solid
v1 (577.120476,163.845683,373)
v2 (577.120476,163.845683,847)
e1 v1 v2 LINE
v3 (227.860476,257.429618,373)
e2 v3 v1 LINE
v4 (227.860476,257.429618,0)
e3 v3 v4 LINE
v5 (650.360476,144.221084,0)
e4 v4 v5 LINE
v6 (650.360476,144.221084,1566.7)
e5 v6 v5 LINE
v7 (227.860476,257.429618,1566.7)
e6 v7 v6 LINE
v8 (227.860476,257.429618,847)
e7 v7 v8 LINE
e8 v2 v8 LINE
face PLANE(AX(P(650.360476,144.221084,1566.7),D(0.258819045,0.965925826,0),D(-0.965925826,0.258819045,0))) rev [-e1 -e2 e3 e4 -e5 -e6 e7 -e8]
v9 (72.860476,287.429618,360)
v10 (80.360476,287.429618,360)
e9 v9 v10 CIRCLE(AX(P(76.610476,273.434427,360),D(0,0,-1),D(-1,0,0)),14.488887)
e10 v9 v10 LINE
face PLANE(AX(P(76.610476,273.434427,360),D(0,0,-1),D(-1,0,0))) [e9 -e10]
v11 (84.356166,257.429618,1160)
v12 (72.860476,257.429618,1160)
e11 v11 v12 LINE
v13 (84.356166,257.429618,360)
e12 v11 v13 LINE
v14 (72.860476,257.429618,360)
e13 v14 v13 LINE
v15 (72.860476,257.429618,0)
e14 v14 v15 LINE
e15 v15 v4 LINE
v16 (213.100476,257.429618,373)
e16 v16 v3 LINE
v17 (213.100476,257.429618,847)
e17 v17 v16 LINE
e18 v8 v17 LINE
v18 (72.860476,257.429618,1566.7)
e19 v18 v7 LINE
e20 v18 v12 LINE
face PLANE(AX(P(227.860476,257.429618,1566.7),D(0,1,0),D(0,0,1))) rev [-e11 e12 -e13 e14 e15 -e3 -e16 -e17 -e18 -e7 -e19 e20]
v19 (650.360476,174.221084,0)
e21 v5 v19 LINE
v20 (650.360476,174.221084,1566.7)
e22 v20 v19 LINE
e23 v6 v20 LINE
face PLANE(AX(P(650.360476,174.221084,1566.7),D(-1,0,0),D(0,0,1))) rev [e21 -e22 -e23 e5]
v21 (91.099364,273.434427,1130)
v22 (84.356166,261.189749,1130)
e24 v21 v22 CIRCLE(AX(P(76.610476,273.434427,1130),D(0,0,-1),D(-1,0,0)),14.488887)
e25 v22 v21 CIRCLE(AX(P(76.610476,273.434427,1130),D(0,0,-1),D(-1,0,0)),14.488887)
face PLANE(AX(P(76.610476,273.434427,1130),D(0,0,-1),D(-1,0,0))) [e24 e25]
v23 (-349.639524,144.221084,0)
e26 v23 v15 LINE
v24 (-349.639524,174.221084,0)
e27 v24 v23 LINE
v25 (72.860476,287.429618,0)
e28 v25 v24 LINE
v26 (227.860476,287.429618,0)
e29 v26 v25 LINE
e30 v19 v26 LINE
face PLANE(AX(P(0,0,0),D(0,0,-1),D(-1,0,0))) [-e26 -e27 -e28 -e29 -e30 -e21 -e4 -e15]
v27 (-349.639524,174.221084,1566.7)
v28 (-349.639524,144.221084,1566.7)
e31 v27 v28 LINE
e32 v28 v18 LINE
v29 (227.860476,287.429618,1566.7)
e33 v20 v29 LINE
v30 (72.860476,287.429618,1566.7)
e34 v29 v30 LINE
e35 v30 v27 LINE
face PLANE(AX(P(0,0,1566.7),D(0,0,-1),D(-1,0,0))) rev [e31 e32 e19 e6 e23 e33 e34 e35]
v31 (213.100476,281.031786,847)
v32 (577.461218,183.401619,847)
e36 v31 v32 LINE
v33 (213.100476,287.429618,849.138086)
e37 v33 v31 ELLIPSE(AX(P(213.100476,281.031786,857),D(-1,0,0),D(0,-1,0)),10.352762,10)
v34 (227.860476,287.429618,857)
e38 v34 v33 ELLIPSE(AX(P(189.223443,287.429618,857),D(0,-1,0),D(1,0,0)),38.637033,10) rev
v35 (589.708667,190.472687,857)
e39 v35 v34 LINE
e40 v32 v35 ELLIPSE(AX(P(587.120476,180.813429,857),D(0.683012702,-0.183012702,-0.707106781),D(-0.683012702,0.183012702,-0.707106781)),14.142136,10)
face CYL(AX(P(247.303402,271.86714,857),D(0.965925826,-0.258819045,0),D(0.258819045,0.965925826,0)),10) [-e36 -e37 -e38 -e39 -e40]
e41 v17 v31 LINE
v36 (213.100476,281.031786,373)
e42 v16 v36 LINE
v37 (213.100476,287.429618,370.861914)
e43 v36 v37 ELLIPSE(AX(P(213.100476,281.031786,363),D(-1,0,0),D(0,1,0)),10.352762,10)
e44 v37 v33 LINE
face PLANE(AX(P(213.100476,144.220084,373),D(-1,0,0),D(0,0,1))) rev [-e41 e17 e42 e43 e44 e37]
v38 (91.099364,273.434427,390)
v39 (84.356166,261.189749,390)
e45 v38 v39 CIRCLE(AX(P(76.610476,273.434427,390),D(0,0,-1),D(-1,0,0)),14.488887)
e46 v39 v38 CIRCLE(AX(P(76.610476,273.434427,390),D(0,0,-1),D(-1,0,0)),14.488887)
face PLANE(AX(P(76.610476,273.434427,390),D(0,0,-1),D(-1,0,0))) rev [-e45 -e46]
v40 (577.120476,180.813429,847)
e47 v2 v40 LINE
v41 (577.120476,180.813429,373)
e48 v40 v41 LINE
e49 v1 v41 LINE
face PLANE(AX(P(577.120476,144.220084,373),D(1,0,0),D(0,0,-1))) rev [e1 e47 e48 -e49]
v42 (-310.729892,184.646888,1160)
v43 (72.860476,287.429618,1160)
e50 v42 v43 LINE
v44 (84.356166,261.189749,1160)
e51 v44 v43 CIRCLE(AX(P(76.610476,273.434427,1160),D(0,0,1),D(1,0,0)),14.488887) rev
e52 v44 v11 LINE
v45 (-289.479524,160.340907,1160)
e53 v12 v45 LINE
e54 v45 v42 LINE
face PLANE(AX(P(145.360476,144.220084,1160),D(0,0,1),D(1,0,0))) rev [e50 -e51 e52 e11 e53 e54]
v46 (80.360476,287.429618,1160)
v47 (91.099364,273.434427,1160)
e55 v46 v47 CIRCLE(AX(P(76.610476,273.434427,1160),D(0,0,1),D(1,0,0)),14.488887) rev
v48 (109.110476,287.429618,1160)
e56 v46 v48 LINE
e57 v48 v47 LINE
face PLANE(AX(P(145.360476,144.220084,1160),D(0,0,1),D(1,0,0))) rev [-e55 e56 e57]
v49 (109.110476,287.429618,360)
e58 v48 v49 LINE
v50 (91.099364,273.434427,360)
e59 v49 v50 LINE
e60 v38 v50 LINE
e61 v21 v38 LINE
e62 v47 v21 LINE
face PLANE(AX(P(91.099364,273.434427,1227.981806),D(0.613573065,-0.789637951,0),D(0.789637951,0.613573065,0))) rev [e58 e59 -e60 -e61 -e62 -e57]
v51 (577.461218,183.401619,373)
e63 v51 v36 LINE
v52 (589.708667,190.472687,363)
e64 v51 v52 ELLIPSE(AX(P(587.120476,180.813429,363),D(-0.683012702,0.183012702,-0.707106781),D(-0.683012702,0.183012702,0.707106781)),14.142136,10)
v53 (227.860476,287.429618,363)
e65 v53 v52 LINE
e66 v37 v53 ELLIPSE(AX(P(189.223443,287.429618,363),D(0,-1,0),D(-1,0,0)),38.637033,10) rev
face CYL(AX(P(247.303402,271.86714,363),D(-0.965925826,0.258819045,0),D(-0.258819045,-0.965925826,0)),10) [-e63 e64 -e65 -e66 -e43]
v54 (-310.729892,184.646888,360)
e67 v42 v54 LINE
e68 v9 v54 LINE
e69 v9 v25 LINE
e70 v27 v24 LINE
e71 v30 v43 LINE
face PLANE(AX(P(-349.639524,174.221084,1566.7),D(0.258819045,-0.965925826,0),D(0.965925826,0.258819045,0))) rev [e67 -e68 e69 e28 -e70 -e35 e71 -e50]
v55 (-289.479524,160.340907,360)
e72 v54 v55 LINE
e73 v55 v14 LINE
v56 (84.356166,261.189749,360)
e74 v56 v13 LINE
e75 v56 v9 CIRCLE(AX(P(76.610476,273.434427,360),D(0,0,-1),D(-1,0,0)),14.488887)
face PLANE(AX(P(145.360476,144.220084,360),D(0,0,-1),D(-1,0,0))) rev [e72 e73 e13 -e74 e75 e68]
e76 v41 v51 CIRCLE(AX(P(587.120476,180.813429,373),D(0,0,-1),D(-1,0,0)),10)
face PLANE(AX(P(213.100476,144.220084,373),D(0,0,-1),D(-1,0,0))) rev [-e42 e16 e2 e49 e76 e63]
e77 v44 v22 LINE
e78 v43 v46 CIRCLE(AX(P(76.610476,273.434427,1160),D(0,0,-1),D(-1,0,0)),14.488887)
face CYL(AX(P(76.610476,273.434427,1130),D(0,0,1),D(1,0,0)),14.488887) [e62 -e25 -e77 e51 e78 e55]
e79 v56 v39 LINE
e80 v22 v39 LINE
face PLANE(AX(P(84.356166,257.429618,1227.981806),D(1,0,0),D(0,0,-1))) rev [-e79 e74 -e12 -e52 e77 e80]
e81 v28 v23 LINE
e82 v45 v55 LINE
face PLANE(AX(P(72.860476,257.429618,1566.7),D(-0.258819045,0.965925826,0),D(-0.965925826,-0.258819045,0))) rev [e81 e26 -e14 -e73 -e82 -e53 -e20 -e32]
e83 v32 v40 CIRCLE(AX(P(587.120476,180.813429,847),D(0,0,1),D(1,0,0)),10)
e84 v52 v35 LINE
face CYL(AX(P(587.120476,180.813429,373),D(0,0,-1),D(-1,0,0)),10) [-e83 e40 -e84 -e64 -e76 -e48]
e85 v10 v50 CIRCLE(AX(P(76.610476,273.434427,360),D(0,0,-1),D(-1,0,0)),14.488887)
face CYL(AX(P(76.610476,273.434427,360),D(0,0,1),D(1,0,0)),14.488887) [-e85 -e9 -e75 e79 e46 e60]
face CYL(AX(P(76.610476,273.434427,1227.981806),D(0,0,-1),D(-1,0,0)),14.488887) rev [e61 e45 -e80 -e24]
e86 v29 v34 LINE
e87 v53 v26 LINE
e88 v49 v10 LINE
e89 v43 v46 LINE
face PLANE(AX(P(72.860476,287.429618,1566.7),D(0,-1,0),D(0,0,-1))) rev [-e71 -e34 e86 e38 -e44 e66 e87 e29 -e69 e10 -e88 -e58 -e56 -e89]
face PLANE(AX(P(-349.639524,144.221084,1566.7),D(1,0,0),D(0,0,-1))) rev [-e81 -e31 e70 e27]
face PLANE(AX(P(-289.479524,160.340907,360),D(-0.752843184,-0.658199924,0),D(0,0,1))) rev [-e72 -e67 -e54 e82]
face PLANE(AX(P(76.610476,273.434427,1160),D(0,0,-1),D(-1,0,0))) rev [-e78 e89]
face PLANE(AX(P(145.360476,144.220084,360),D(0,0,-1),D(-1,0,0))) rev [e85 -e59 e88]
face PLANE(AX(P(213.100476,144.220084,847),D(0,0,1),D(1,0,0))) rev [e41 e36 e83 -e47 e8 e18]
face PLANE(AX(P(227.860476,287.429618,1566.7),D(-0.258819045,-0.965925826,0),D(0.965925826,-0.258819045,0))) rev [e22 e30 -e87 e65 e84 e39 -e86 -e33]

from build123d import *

# Parameters (mm, degrees)
AUFSATZ_LINEAR_AUSTRAGEN1_DEPTH = 1566.7
SCHNITT_LINEAR_AUSTRAGEN1_REACH = 1704.359
FASE1_SIZE2                     = 30
FASE1_SIZE                      = 22
VERRUNDUNG1_R                   = 10
SKIZZE4_R                       = 14.488887394336269
AUFSATZ_LINEAR_AUSTRAGEN3_DEPTH = 30
AUFSATZ_LINEAR_AUSTRAGEN7_REACH = 1402.712
LINEARES_MUSTER2_COUNT          = 2
LINEARES_MUSTER2_PITCH          = 770.0000000000005


with BuildPart() as part:
    # Skizze1 → Aufsatz-Linear austragen1 (new body)
    with BuildSketch(Plane.XY):
        Polygon((650.3604764885325, 174.22108378429925), (650.3604764885325, 144.22108378429925), (227.86047648853256, 257.42961758644554), (72.86047648853256, 257.42961758644554), (-349.6395235114674, 144.22108378429914), (-349.6395235114674, 174.2210837842995), (72.86047648853253, 287.42961758644606), (227.8604764885318, 287.42961758644606), align=None)
    extrude(amount=AUFSATZ_LINEAR_AUSTRAGEN1_DEPTH)

    # Skizze2 → Schnitt-Linear austragen1 (cut, up to next)
    with BuildSketch(Plane(origin=(0, 287.42961758644606, 0), x_dir=(1, 0, 0), z_dir=(0, 1, 0)), mode=Mode.PRIVATE) as schnitt_linear_austragen1_sk1:
        Polygon((145.36047648853253, -360), (-289.47952351146745, -360.00000000000006), (-289.47952351146733, -1160.0000000000002), (145.36047648853264, -1160.0000000000005), align=None)
    schnitt_linear_austragen1_tool1 = extrude(schnitt_linear_austragen1_sk1.sketch, amount=-SCHNITT_LINEAR_AUSTRAGEN1_REACH, mode=Mode.PRIVATE) & part.part
    # Skizze2 → Schnitt-Linear austragen1 (cut, up to next)
    with BuildSketch(Plane(origin=(0, 287.42961758644606, 0), x_dir=(1, 0, 0), z_dir=(0, 1, 0)), mode=Mode.PRIVATE) as schnitt_linear_austragen1_sk2:
        Polygon((213.10047648853242, -373), (577.1204764885325, -372.99999999999994), (577.1204764885326, -847), (213.10047648853248, -847.0000000000001), align=None)
    schnitt_linear_austragen1_tool2 = extrude(schnitt_linear_austragen1_sk2.sketch, amount=-SCHNITT_LINEAR_AUSTRAGEN1_REACH, mode=Mode.PRIVATE) & part.part
    add(schnitt_linear_austragen1_tool1.solids().sort_by_distance((-72.059524, 287.429618, 760))[0], mode=Mode.SUBTRACT)
    add(schnitt_linear_austragen1_tool2.solids().sort_by_distance((395.110476, 287.429618, 610))[0], mode=Mode.SUBTRACT)

    # Fase1
    fase1_edges = [part.edges().sort_by_distance(p)[0] for p in [
        (-289.47952351146745, 190.34090720095548, 760.0000000000001),
    ]]
    fase1_side = [part.faces().sort_by_distance(p)[0] for p in [
        (-289.90453087503465, 190.22702682111037, 760.0000000000001),
    ]]
    chamfer(fase1_edges, length=FASE1_SIZE - 0.0001, length2=FASE1_SIZE2 - 0.0001, reference=fase1_side[0])  # a hair under: the kernel refuses the full size

    # Verrundung1
    verrundung1_edges = [part.edges().sort_by_distance(p)[0] for p in [
        (402.49047648853224, 240.6376501122001, 847),
    ]]
    fillet(verrundung1_edges, radius=VERRUNDUNG1_R)
    verrundung1_2_edges = [part.edges().sort_by_distance(p)[0] for p in [
        (577.1204764885325, 193.84568263795418, 610),
    ]]
    fillet(verrundung1_2_edges, radius=VERRUNDUNG1_R - 0.0001)  # a hair under: the kernel refuses the full size
    verrundung1_3_edges = [part.edges().sort_by_distance(p)[0] for p in [
        (402.4904764885322, 240.6376501122001, 373),
    ]]
    fillet(verrundung1_3_edges, radius=VERRUNDUNG1_R)

    # Skizze4 → Aufsatz-Linear austragen3 (add)
    with BuildSketch(Plane(origin=(-5.9234e-13, 0, 1160.0000000000005), x_dir=(-1, 0, -5.1e-16), z_dir=(5.1e-16, 0, -1))):
        with Locations(Location((-76.61047648853322, 273.43442705806245, 0), (0, 0, 105))):
            Circle(SKIZZE4_R)
    aufsatz_linear_austragen3 = extrude(amount=AUFSATZ_LINEAR_AUSTRAGEN3_DEPTH)

    # Aufsatz-Linear austragen7: up to this face of the body (flat: up to its plane)
    aufsatz_linear_austragen7_end = Plane(part.part.faces().sort_by_distance((-85.378398687, 228.495263502, 1160))[0])
    # Skizze6 → Aufsatz-Linear austragen7 (add, up to the picked face)
    with BuildSketch(Plane.XY.offset(360), mode=Mode.PRIVATE) as aufsatz_linear_austragen7_sk1:
        with BuildLine():
            Line((145.36047648853247, 287.42961758644606), (145.36047648853247, 257.42961758644554))
            Line((145.36047648853247, 257.42961758644554), (84.35616614086427, 257.42961758644554))
            Line((84.35616614086427, 257.42961758644554), (84.35616614086427, 261.189748632905))
            ThreePointArc((84.35616614086427, 261.189748632905), (89.30209346766217, 266.44509830768715), (91.09936388286874, 273.43442705806245))
            Line((91.09936388286874, 273.43442705806245), (109.11047648853247, 287.42961758644606))
            Line((109.11047648853247, 287.42961758644606), (145.36047648853247, 287.42961758644606))
        make_face()
    aufsatz_linear_austragen7_tool1 = split(extrude(aufsatz_linear_austragen7_sk1.sketch, amount=AUFSATZ_LINEAR_AUSTRAGEN7_REACH, mode=Mode.PRIVATE), bisect_by=aufsatz_linear_austragen7_end, keep=Keep.BOTH, mode=Mode.PRIVATE)
    add(aufsatz_linear_austragen7_tool1.solids().sort_by(Axis((118.992611, 271.244941, 360), (0, 0, 1)))[0])

    # Lineares Muster2: Aufsatz-Linear austragen3 ×2
    with Locations(*[(0, 0, -i * LINEARES_MUSTER2_PITCH) for i in range(1, LINEARES_MUSTER2_COUNT)]):
        add(aufsatz_linear_austragen3)


solid = part.part
